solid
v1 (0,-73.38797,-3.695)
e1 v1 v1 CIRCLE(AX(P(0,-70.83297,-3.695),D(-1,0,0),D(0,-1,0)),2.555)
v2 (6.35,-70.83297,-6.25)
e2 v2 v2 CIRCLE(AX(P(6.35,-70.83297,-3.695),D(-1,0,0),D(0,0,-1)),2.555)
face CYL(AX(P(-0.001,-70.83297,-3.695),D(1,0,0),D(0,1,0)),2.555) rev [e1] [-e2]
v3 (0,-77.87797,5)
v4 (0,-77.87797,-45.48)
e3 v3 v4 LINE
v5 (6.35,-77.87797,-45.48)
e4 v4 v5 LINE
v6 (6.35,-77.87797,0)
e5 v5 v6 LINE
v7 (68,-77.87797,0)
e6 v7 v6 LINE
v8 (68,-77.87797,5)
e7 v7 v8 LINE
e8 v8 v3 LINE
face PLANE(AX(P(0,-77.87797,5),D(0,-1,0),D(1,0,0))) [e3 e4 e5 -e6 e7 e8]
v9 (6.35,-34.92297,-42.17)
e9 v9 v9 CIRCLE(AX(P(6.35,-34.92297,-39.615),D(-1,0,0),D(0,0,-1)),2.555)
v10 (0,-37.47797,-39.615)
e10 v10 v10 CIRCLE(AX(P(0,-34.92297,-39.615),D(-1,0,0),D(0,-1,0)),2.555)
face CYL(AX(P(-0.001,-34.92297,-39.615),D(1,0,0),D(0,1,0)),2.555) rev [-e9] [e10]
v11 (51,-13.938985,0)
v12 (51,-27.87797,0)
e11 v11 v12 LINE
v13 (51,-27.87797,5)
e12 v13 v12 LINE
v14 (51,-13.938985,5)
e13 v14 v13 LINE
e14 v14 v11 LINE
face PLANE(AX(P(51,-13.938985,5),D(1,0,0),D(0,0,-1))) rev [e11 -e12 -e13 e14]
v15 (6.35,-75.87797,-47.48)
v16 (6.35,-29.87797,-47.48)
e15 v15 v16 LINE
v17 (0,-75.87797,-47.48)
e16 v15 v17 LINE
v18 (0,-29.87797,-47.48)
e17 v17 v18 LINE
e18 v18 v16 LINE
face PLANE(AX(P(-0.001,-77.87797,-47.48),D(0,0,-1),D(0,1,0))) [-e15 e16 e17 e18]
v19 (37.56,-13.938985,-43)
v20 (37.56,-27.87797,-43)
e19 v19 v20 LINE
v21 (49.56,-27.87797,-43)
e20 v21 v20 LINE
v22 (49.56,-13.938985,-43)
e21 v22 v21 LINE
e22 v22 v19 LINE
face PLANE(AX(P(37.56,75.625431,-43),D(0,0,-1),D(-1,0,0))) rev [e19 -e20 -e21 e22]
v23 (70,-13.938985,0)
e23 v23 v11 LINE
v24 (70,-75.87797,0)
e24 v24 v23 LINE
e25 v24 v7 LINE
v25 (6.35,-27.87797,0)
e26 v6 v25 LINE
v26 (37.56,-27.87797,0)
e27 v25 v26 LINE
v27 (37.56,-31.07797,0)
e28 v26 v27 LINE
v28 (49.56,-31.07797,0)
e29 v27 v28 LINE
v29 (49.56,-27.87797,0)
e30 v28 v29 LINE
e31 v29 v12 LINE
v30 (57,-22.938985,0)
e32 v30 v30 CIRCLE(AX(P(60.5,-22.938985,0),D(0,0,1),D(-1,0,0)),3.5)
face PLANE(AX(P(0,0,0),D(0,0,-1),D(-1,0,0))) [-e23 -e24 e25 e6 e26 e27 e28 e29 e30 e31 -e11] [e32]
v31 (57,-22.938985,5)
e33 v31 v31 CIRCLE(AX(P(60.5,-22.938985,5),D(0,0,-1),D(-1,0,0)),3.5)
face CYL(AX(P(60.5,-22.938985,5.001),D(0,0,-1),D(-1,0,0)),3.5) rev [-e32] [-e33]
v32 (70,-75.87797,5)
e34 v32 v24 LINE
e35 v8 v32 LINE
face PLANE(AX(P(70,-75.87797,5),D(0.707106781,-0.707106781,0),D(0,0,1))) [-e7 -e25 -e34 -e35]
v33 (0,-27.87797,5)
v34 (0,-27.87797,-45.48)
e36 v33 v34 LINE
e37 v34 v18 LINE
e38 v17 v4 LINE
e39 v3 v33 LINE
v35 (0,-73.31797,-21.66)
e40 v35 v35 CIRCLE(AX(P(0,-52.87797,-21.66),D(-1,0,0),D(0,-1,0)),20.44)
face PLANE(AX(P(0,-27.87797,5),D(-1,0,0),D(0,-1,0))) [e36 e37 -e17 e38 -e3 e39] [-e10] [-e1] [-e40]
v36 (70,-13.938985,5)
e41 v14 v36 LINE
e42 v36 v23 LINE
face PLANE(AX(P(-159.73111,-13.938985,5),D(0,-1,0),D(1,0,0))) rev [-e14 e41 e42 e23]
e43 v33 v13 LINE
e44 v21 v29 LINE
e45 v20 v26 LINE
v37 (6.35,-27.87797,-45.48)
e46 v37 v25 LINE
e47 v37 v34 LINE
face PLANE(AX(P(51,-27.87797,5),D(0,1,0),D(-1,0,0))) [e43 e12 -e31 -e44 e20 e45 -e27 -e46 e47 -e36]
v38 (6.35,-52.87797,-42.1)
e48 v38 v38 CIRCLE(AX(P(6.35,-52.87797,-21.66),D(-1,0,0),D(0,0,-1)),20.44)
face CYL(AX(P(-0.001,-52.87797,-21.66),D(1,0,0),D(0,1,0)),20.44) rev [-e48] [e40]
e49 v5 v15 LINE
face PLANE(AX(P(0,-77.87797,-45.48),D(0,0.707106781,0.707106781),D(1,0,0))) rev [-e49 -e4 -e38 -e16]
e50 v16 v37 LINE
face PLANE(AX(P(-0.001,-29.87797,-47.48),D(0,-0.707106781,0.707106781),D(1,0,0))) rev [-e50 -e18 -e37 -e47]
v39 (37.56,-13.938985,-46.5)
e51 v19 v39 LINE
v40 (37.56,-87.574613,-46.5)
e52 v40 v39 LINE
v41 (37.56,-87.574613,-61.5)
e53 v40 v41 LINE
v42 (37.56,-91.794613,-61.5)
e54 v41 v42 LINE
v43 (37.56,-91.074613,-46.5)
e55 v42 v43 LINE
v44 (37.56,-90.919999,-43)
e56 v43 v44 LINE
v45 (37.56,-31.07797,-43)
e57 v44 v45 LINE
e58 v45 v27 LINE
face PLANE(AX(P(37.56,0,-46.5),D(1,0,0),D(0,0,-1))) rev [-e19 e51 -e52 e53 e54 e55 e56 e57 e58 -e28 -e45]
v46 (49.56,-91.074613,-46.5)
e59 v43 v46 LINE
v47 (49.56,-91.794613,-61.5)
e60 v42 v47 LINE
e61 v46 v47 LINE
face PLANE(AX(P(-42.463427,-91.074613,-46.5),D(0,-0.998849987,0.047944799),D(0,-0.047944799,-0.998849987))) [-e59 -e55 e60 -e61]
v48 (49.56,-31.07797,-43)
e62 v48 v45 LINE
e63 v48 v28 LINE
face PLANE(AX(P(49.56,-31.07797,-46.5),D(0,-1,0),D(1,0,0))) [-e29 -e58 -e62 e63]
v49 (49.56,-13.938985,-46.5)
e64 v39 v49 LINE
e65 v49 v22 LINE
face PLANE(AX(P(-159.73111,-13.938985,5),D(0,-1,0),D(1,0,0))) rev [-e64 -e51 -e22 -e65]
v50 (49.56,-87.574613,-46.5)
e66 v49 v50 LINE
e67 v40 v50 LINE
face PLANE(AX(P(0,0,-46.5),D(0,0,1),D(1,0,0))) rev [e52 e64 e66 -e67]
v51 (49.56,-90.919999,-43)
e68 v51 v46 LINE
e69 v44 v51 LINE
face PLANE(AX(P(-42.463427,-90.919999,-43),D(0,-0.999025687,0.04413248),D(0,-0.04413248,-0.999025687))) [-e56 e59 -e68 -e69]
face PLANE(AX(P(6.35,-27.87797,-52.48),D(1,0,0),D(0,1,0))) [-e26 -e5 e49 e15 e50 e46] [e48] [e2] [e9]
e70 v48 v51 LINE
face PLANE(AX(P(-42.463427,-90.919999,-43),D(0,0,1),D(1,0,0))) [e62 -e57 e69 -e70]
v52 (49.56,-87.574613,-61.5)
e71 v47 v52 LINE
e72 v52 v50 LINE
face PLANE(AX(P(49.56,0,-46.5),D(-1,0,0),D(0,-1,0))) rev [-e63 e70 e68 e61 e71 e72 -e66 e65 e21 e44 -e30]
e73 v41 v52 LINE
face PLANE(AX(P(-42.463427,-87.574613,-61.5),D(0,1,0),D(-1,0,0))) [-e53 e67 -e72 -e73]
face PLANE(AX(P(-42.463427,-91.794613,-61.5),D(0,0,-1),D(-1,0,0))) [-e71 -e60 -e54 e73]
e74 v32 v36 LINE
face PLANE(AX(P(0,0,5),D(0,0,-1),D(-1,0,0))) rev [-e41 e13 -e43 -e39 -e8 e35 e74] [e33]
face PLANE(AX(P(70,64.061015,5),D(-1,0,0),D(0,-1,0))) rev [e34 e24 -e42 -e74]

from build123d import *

# Parameters (mm, degrees)
BOSS_EXTRUDE1_DEPTH   = 5
SKETCH2_W             = 6.35
SKETCH2_H             = 50
BOSS_EXTRUDE2_DEPTH   = 52.48
CUT_EXTRUDE1_REACH    = 106.448
SKETCH3_R             = 20.44
SKETCH3_R_2           = 2.555
SKETCH3_W             = 5
SKETCH3_H             = 50
CUT_EXTRUDE2_REACH    = 108.104
SKETCH4_R             = 3.5
CUT_EXTRUDE6_REACH    = 108.104
SKETCH14_W            = 23.196263878
SKETCH14_H            = 15.316152196
SKETCH15_W            = 12
SKETCH15_H            = 3.2
BOSS_EXTRUDE7_DEPTH   = 46.5
BOSS_EXTRUDE8_REACH   = 98.667
SKETCH16_W            = 12
SKETCH16_H            = 3.5
SKETCH17_W            = 12
SKETCH17_H            = 3.5
BOSS_EXTRUDE9_DEPTH   = 15
CHAMFER2_SIZE         = 2
SKETCH22_W            = 12
SKETCH22_H            = 15
BOSS_EXTRUDE10_DEPTH  = 0.72
CUT_EXTRUDE8_REACH    = 103.606
CUT_EXTRUDE7_REACH    = 120.762
SKETCH18_R            = 3.25
MIRROR2_OUTLINE_W     = 50
MIRROR2_OUTLINE_H     = 5
MIRROR2_DEPTH         = 68
MIRROR2_2_OUTLINE_R   = 2.555
MIRROR2_2_OUTLINE_R_2 = 20.44
MIRROR2_2_DEPTH       = 6.35
MIRROR2_START         = 37.56
MIRROR2_3_DEPTH       = 12
MIRROR2_START_2       = 51
MIRROR2_4_OUTLINE_W   = 13.938985111
MIRROR2_4_OUTLINE_H   = 5
MIRROR2_4_DEPTH       = 5.9999999
MIRROR2_START_3       = 64.0000001
MIRROR2_5_OUTLINE_W   = 13.938985111
MIRROR2_5_OUTLINE_H   = 5
MIRROR2_5_DEPTH       = 5.9999999
MIRROR2_6_DEPTH       = 5
BOSS_EXTRUDE11_DEPTH  = 12
CUT_EXTRUDE9_REACH    = 132.799
SKETCH26_W            = 121.241742099
SKETCH26_H            = 103.992632166


with BuildPart() as part:
    # Sketch1 → Boss-Extrude1 (new body)
    with BuildSketch(Plane.XY):
        Polygon((0, 0), (0, 50), (51, 50), (51, 64.061014889), (70, 64.061014889), (70, -13.938985111), (51, -13.938985111), (51, 0), align=None)
    extrude(amount=BOSS_EXTRUDE1_DEPTH)

    # Sketch2 → Boss-Extrude2 (add)
    with BuildSketch(Plane(origin=(0, 0, 0), x_dir=(-1, 0, 0), z_dir=(0, 0, -1))):
        with Locations((-3.175, 25)):
            Rectangle(SKETCH2_W, SKETCH2_H)
    extrude(amount=BOSS_EXTRUDE2_DEPTH)

    # Sketch3 → Cut-Extrude1 (cut, up to next)
    with BuildSketch(Plane(origin=(6.35, 0, 0), x_dir=(0, 0, -1), z_dir=(1, 0, 0)), mode=Mode.PRIVATE) as cut_extrude1_sk1:
        with Locations((21.66, 25)):
            Circle(SKETCH3_R)
    cut_extrude1_tool1 = extrude(cut_extrude1_sk1.sketch, amount=-CUT_EXTRUDE1_REACH, mode=Mode.PRIVATE) & part.part
    # Sketch3 → Cut-Extrude1 (cut, up to next)
    with BuildSketch(Plane(origin=(6.35, 0, 0), x_dir=(0, 0, -1), z_dir=(1, 0, 0)), mode=Mode.PRIVATE) as cut_extrude1_sk2:
        with Locations((3.695, 42.955)):
            Circle(SKETCH3_R_2)
    cut_extrude1_tool2 = extrude(cut_extrude1_sk2.sketch, amount=-CUT_EXTRUDE1_REACH, mode=Mode.PRIVATE) & part.part
    # Sketch3 → Cut-Extrude1 (cut, up to next)
    with BuildSketch(Plane(origin=(6.35, 0, 0), x_dir=(0, 0, -1), z_dir=(1, 0, 0)), mode=Mode.PRIVATE) as cut_extrude1_sk3:
        with Locations((39.615, 7.045)):
            Circle(SKETCH3_R_2)
    cut_extrude1_tool3 = extrude(cut_extrude1_sk3.sketch, amount=-CUT_EXTRUDE1_REACH, mode=Mode.PRIVATE) & part.part
    # Sketch3 → Cut-Extrude1 (cut, up to next)
    with BuildSketch(Plane(origin=(6.35, 0, 0), x_dir=(0, 0, -1), z_dir=(1, 0, 0)), mode=Mode.PRIVATE) as cut_extrude1_sk4:
        with Locations((49.98, 25)):
            Rectangle(SKETCH3_W, SKETCH3_H)
    cut_extrude1_tool4 = extrude(cut_extrude1_sk4.sketch, amount=-CUT_EXTRUDE1_REACH, mode=Mode.PRIVATE) & part.part
    add(cut_extrude1_tool1.solids().sort_by_distance((6.35, 25, -21.66))[0], mode=Mode.SUBTRACT)
    add(cut_extrude1_tool2.solids().sort_by_distance((6.35, 42.955, -3.695))[0], mode=Mode.SUBTRACT)
    add(cut_extrude1_tool3.solids().sort_by_distance((6.35, 7.045, -39.615))[0], mode=Mode.SUBTRACT)
    add(cut_extrude1_tool4.solids().sort_by_distance((6.35, 25, -49.98))[0], mode=Mode.SUBTRACT)

    # Sketch4 → Cut-Extrude2 (cut, up to next)
    with BuildSketch(Plane(origin=(0, 0, 0), x_dir=(-1, 0, 0), z_dir=(0, 0, -1)), mode=Mode.PRIVATE) as cut_extrude2_sk1:
        with Locations((-60.5, 55.061014889)):
            Circle(SKETCH4_R)
    cut_extrude2_tool1 = extrude(cut_extrude2_sk1.sketch, amount=-CUT_EXTRUDE2_REACH, mode=Mode.PRIVATE) & part.part
    # Sketch4 → Cut-Extrude2 (cut, up to next)
    with BuildSketch(Plane(origin=(0, 0, 0), x_dir=(-1, 0, 0), z_dir=(0, 0, -1)), mode=Mode.PRIVATE) as cut_extrude2_sk2:
        with Locations((-60.5, -4.938985111)):
            Circle(SKETCH4_R)
    cut_extrude2_tool2 = extrude(cut_extrude2_sk2.sketch, amount=-CUT_EXTRUDE2_REACH, mode=Mode.PRIVATE) & part.part
    add(cut_extrude2_tool1.solids().sort_by_distance((60.5, 55.061015, 0))[0], mode=Mode.SUBTRACT)
    add(cut_extrude2_tool2.solids().sort_by_distance((60.5, -4.938985, 0))[0], mode=Mode.SUBTRACT)

    # Sketch14 → Cut-Extrude6 (cut, up to next)
    with BuildSketch(Plane(origin=(0, 0, 0), x_dir=(-1, 0, 0), z_dir=(0, 0, -1)), mode=Mode.PRIVATE) as cut_extrude6_sk1:
        with Locations((-62.598131939, 57.658076098)):
            Rectangle(SKETCH14_W, SKETCH14_H)
    cut_extrude6_tool1 = extrude(cut_extrude6_sk1.sketch, amount=-CUT_EXTRUDE6_REACH, mode=Mode.PRIVATE) & part.part
    add(cut_extrude6_tool1.solids().sort_by_distance((62.598132, 57.658076, 0))[0], mode=Mode.SUBTRACT)

    # Sketch15 → Boss-Extrude7 (add)
    with BuildSketch(Plane(origin=(0, 0, 0), x_dir=(-1, 0, 0), z_dir=(0, 0, -1))):
        with Locations((-43.56, 1.6)):
            Rectangle(SKETCH15_W, SKETCH15_H)
    extrude(amount=BOSS_EXTRUDE7_DEPTH)

    # Boss-Extrude8: up to this plane
    boss_extrude8_end = Plane(origin=(166.832994776, 64.085435133, -66.619565524), z_dir=(-1.1416993347548052e-15, 0.9990256874715413, 0.04413247978546202))
    # Sketch16 → Boss-Extrude8 (add, up to the surface)
    with BuildSketch(Plane(origin=(0, 3.2, 0), x_dir=(1, 0, 0), z_dir=(0, 1, 0)), mode=Mode.PRIVATE) as boss_extrude8_sk1:
        with Locations((43.56, 44.75)):
            Rectangle(SKETCH16_W, SKETCH16_H)
    boss_extrude8_tool1 = split(extrude(boss_extrude8_sk1.sketch, amount=BOSS_EXTRUDE8_REACH, mode=Mode.PRIVATE), bisect_by=boss_extrude8_end, keep=Keep.BOTH, mode=Mode.PRIVATE)
    add(boss_extrude8_tool1.solids().sort_by_distance((43.56, 3.2, -44.75))[0])

    # Sketch17 → Boss-Extrude9 (add)
    with BuildSketch(Plane(origin=(0, 0, -46.5), x_dir=(-1, 0, 0), z_dir=(0, 0, -1))):
        with Locations((-43.56, 61.446642853)):
            Rectangle(SKETCH17_W, SKETCH17_H)
    extrude(amount=BOSS_EXTRUDE9_DEPTH)

    # Chamfer2
    chamfer2_edges = [part.edges().sort_by_distance(p)[0] for p in [
        (3.175, 0, -47.48),
        (3.175, 50, -47.48),
        (70, 50, 2.5),
    ]]
    chamfer(chamfer2_edges, length=CHAMFER2_SIZE)

    # Sketch22 → Boss-Extrude10 (add)
    with BuildSketch(Plane(origin=(0, 63.196642853, 0), x_dir=(1, 0, 0), z_dir=(0, 1, 0))):
        with Locations((43.56, 54)):
            Rectangle(SKETCH22_W, SKETCH22_H)
    extrude(amount=BOSS_EXTRUDE10_DEPTH)

    # Sketch23 → Cut-Extrude8 (cut, up to next)
    with BuildSketch(Plane(origin=(49.56, 0, 0), x_dir=(0, 0, -1), z_dir=(1, 0, 0)), mode=Mode.PRIVATE) as cut_extrude8_sk1:
        Polygon((46.5, 63.916642853), (46.5, 63.196642853), (61.5, 63.916642853), align=None)
    cut_extrude8_tool1 = extrude(cut_extrude8_sk1.sketch, amount=-CUT_EXTRUDE8_REACH, mode=Mode.PRIVATE) & part.part
    add(cut_extrude8_tool1.solids().sort_by_distance((49.56, 63.676643, -51.5))[0], mode=Mode.SUBTRACT)

    # Cut-Extrude7: up to this plane
    cut_extrude7_end = Plane(origin=(-0.001, 63.196642853, -46.5), z_dir=(-2.1659106514416256e-15, -0.9988499868416298, -0.04794479936839813))
    # Sketch18 → Cut-Extrude7 (cut, up to the surface)
    with BuildSketch(Plane.XZ.offset(-59.696642853), mode=Mode.PRIVATE) as cut_extrude7_sk1:
        with Locations(Location((43.56, -52.57, 0), (0, 0, 270))):
            Circle(SKETCH18_R)
    cut_extrude7_tool1 = split(extrude(cut_extrude7_sk1.sketch, amount=-CUT_EXTRUDE7_REACH, mode=Mode.PRIVATE), bisect_by=cut_extrude7_end, keep=Keep.BOTH, mode=Mode.PRIVATE)
    add(cut_extrude7_tool1.solids().sort_by_distance((43.56, 59.696643, -52.57))[0], mode=Mode.SUBTRACT)



with BuildPart() as body_2:
    # Mirror2: read off the stored shape, not the designer's step
    # Mirror2 outline → Mirror2 (new body)
    with BuildSketch(Plane.YZ):
        with Locations((-52.877970222, 2.5)):
            Rectangle(MIRROR2_OUTLINE_W, MIRROR2_OUTLINE_H)
    extrude(amount=MIRROR2_DEPTH)

    # Mirror2 2 outline → Mirror2 2 (add)
    with BuildSketch(Plane.YZ):
        Polygon((-27.877970222, -45.48), (-27.877970222, 0), (-77.877970222, 0), (-77.877970222, -45.48), (-75.877970222, -47.48), (-29.877970222, -47.48), align=None)
        with Locations((-34.922970222, -39.615)):
            Circle(MIRROR2_2_OUTLINE_R, mode=Mode.SUBTRACT)
        with Locations((-70.832970222, -3.695)):
            Circle(MIRROR2_2_OUTLINE_R, mode=Mode.SUBTRACT)
        with Locations((-52.877970222, -21.66)):
            Circle(MIRROR2_2_OUTLINE_R_2, mode=Mode.SUBTRACT)
    extrude(amount=MIRROR2_2_DEPTH)


with BuildPart() as part_1:
    add(part.part)

    add(body_2.part)  # Mirror2 3 merges body 2
    # Mirror2 3 outline → Mirror2 3 (add)
    with BuildSketch(Plane.YZ.offset(MIRROR2_START)):
        Polygon((-31.077970222, -46.5), (0, -46.5), (0, -43), (-27.877970222, -43), (-27.877970222, 0), (-31.077970222, 0), align=None)
    extrude(amount=MIRROR2_3_DEPTH)

    # Mirror2 4 outline → Mirror2 4 (add)
    with BuildSketch(Plane.YZ.offset(MIRROR2_START_2)):
        with Locations((-20.908477667, 2.5)):
            Rectangle(MIRROR2_4_OUTLINE_W, MIRROR2_4_OUTLINE_H)
    extrude(amount=MIRROR2_4_DEPTH)

    # Mirror2 5 outline → Mirror2 5 (add)
    with BuildSketch(Plane.YZ.offset(MIRROR2_START_3)):
        with Locations((-20.908477667, 2.5)):
            Rectangle(MIRROR2_5_OUTLINE_W, MIRROR2_5_OUTLINE_H)
    extrude(amount=MIRROR2_5_DEPTH)

    # Mirror2 6 outline → Mirror2 6 (add)
    with BuildSketch(Plane.XY):
        Polygon((70, -75.877970222), (70, -27.877970222), (68, -27.877970222), (68, -77.877970222), align=None)
        with BuildLine():
            Line((64.0000001, -27.877970222), (64, -22.938985111))
            ThreePointArc((64, -22.938985111), (60.5, -26.438985111), (57, -22.938985111))
            Line((57, -22.938985111), (56.9999999, -27.877970222))
            Line((56.9999999, -27.877970222), (64.0000001, -27.877970222))
        make_face()
        with BuildLine():
            ThreePointArc((57, -22.938985111), (60.5, -19.438985111), (64, -22.938985111))
            Line((64, -22.938985111), (64.0000001, -13.938985111))
            Line((64.0000001, -13.938985111), (56.9999999, -13.938985111))
            Line((56.9999999, -13.938985111), (57, -22.938985111))
        make_face()
    extrude(amount=MIRROR2_6_DEPTH)

    # Sketch25 → Boss-Extrude11 (add)
    with BuildSketch(Plane(origin=(49.56, 0, 0), x_dir=(0, 0, -1), z_dir=(1, 0, 0))):
        Polygon((43, -13.938985111), (46.5, -13.938985111), (46.5, -87.574613075), (61.5, -87.574613075), (61.5, -91.794613075), (46.5, -91.074613075), (43, -90.919998753), (43, -31.077970222), align=None)
    extrude(amount=-BOSS_EXTRUDE11_DEPTH)

    # Cut-Extrude9: up to this face of the body (flat: up to its plane)
    cut_extrude9_end = Plane(part_1.part.faces().sort_by_distance((0, 0.724855186, -20.24))[0])
    # Sketch26 → Cut-Extrude9 (cut, up to the picked face)
    with BuildSketch(Plane(origin=(70, 0, 0), x_dir=(0, 0, -1), z_dir=(1, 0, 0)), mode=Mode.PRIVATE) as cut_extrude9_sk1:
        with Locations((55.62087105, 38.057330972)):
            Rectangle(SKETCH26_W, SKETCH26_H)
    cut_extrude9_tool1 = split(extrude(cut_extrude9_sk1.sketch, amount=-CUT_EXTRUDE9_REACH, mode=Mode.PRIVATE), bisect_by=cut_extrude9_end, keep=Keep.BOTH, mode=Mode.PRIVATE)
    add(cut_extrude9_tool1.solids().sort_by(Axis((70, 38.057331, -55.620871), (-1, 0, 0)))[0], mode=Mode.SUBTRACT)


solid = part_1.part
